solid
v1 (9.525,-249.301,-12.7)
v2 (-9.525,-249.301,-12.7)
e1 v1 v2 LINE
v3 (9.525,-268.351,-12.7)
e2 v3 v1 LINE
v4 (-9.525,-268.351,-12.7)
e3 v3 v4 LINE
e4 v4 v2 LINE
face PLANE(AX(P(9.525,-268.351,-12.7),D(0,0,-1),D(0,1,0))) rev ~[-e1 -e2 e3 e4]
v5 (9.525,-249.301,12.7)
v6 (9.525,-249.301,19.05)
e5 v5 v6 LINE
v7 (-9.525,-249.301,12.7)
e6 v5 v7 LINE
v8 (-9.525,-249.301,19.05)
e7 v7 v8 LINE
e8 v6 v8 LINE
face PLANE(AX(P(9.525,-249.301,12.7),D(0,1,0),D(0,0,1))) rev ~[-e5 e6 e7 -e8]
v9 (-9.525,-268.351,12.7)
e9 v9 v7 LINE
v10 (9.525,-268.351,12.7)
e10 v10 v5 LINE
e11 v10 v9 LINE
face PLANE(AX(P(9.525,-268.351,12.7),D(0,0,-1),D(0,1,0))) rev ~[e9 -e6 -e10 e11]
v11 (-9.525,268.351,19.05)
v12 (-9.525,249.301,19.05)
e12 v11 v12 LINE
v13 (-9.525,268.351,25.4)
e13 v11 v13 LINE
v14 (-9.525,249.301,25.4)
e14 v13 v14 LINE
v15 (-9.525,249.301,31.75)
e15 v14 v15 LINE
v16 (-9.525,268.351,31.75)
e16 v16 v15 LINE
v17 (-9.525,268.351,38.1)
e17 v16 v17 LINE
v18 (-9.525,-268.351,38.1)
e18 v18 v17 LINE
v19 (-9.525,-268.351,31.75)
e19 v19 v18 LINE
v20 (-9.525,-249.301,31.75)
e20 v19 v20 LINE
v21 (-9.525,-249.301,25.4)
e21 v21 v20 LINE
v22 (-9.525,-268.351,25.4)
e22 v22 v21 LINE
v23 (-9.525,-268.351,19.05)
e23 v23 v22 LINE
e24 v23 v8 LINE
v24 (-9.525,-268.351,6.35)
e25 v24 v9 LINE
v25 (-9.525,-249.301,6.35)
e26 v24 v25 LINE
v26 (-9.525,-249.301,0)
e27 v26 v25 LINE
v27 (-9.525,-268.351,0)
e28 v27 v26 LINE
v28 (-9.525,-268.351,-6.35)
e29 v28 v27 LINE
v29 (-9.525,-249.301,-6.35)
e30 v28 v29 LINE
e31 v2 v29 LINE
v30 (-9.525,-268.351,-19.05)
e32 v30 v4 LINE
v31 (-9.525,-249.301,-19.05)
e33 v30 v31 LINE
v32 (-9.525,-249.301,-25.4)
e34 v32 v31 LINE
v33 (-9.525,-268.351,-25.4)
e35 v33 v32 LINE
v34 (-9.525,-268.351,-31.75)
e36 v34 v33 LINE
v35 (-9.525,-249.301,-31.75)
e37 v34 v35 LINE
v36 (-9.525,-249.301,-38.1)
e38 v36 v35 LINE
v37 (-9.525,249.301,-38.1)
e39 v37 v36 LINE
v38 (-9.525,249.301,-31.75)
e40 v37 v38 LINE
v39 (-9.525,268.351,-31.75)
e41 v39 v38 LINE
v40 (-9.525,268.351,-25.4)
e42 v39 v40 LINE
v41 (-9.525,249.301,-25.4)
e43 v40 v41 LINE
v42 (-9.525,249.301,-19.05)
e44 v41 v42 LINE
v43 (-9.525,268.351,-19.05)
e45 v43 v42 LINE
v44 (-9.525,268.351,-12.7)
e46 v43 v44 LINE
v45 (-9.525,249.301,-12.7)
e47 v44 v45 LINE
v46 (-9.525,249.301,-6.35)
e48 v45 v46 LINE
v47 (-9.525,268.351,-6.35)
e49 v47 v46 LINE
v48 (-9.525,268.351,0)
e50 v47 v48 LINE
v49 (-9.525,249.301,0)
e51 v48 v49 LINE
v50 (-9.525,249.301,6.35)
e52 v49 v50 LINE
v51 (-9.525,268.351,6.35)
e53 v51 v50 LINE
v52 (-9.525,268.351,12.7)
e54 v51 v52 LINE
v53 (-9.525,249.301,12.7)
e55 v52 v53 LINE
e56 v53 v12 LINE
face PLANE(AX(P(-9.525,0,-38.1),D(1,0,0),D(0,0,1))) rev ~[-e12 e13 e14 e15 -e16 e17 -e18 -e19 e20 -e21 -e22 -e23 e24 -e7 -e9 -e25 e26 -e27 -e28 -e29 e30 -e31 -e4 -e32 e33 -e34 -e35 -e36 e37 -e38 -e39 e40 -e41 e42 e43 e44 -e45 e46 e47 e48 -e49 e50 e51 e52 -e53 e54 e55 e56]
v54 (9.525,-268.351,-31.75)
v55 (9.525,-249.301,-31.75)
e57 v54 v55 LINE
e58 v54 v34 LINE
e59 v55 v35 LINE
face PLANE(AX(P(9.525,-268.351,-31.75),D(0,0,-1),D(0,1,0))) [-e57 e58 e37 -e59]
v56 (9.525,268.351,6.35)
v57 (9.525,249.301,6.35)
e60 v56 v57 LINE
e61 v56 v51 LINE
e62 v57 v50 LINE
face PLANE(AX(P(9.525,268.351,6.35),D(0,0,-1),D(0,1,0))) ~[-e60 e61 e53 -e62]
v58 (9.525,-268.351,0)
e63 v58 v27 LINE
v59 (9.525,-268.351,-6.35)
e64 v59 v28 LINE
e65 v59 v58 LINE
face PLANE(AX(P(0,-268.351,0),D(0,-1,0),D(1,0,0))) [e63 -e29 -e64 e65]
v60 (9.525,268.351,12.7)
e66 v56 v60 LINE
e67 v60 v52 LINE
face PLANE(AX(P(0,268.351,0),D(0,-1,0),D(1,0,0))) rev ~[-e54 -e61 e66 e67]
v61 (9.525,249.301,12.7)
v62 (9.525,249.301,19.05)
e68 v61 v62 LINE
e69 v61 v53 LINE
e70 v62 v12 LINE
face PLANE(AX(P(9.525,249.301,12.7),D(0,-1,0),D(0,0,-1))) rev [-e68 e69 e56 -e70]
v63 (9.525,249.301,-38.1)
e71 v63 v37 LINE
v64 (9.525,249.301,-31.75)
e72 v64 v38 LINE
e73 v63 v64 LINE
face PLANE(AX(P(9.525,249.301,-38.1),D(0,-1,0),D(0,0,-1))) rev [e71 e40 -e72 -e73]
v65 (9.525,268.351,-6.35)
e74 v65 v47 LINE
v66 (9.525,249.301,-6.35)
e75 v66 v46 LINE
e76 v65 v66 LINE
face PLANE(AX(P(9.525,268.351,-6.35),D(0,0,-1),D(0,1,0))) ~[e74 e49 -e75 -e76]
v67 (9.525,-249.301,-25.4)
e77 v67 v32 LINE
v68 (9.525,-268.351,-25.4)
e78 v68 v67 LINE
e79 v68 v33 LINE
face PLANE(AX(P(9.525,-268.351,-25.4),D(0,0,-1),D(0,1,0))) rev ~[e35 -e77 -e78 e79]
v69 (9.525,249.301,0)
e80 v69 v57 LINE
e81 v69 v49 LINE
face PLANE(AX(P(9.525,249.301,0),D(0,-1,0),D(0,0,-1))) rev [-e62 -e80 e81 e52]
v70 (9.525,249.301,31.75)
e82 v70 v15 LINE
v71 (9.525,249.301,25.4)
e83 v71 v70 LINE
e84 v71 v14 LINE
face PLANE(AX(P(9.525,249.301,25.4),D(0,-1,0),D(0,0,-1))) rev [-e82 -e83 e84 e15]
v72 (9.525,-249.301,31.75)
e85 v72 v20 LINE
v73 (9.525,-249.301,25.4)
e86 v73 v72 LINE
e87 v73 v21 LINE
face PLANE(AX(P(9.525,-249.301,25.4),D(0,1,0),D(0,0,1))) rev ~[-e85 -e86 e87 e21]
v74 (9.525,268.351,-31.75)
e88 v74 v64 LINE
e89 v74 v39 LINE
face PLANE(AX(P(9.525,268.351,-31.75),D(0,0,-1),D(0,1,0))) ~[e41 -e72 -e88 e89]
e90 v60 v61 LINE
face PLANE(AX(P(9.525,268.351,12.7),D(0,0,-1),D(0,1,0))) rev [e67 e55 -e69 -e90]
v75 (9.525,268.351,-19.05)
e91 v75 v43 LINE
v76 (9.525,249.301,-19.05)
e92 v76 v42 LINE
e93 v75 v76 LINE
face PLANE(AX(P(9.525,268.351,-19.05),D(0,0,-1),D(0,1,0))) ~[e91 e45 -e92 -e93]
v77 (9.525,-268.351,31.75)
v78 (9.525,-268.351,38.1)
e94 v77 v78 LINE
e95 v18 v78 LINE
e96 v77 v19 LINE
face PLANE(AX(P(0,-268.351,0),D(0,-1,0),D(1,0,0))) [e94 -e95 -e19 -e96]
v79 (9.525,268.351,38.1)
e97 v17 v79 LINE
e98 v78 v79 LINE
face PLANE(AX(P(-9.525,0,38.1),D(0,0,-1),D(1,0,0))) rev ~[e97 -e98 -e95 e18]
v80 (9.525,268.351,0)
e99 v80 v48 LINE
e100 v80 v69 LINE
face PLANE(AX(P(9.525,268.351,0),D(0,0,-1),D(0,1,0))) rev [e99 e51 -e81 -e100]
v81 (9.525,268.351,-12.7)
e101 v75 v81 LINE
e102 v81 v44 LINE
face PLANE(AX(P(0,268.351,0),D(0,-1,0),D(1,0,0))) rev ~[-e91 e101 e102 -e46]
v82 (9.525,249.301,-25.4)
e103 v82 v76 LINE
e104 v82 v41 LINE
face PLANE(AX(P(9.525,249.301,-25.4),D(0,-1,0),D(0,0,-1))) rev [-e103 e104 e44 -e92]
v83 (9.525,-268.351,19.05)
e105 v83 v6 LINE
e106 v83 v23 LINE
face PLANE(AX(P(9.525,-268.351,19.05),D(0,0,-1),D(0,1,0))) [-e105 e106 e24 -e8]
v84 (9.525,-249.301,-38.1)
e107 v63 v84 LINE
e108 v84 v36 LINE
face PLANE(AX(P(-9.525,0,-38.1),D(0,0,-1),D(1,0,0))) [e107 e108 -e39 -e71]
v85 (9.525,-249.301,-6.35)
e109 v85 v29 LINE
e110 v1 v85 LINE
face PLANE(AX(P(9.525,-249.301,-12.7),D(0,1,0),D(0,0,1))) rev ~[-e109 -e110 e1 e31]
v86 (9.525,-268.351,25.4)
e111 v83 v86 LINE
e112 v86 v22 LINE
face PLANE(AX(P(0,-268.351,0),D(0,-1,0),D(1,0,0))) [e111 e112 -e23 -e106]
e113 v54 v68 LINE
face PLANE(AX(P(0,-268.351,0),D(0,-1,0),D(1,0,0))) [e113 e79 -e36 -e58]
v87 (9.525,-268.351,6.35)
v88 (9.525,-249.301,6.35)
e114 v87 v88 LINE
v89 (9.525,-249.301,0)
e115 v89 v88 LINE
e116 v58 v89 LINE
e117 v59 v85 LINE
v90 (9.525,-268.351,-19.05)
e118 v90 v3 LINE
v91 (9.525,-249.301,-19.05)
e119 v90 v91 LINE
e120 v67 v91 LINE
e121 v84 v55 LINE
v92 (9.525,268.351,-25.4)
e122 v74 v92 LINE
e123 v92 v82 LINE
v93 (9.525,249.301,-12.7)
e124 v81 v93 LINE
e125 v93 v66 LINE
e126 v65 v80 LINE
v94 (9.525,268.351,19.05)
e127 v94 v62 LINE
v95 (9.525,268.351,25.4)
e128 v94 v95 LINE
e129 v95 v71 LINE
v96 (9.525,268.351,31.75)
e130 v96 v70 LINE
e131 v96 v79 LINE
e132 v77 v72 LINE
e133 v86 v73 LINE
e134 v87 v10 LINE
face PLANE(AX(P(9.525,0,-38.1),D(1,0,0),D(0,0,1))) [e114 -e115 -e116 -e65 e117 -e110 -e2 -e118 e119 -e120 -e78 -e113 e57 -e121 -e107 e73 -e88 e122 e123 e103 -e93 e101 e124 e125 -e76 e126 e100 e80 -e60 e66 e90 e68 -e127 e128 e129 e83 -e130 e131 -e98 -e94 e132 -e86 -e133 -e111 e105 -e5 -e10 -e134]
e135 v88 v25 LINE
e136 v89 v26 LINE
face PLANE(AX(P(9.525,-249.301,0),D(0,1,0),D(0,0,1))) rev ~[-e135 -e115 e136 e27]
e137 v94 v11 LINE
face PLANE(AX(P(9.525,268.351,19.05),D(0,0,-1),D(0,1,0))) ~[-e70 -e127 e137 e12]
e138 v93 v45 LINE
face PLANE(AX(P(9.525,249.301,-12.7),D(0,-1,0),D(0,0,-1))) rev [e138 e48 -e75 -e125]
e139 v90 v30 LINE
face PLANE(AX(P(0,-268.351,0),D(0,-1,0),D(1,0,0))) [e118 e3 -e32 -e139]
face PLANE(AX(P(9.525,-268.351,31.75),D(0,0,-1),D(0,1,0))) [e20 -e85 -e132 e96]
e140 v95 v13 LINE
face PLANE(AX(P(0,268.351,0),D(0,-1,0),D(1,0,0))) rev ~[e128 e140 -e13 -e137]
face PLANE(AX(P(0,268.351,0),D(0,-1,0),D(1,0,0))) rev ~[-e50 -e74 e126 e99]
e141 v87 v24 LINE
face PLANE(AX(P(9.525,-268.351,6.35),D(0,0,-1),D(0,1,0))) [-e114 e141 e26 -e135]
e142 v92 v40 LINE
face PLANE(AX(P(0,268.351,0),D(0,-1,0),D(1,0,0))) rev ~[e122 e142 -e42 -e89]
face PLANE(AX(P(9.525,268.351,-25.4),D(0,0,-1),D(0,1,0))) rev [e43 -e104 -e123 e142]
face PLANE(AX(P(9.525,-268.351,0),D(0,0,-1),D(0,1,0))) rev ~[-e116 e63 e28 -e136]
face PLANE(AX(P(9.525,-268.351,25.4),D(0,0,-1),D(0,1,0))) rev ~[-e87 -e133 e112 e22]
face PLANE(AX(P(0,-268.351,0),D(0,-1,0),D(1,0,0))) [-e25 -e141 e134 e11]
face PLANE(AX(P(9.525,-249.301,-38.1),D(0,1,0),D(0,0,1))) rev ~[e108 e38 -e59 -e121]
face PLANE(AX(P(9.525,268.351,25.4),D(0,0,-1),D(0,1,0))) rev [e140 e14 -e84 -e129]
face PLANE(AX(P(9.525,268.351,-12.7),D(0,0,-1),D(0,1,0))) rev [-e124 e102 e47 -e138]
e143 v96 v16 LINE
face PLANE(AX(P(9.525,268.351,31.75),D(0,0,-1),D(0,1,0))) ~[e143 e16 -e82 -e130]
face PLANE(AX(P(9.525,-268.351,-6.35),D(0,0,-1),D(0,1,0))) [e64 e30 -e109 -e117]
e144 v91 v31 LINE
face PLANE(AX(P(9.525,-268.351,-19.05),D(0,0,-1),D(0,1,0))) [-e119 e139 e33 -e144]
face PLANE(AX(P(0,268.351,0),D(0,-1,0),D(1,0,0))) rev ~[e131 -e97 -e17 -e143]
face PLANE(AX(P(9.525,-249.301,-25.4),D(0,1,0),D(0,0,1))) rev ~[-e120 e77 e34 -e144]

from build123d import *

# Parameters (mm, degrees)
F0_W     = 19.05
F0_H     = 76.2
F1_DEPTH = 268.351
F2_W     = 19.05
F2_H     = 6.35
F3_DEPTH = 19.051


# Not quite as in the source:
# - a pattern or mirror of a feature is missing from the dataset's text; its kind, count and spacing are read off the source's solid


with BuildPart() as f1:
    # F0 (on Front) → F1 (new body, symmetric)
    with BuildSketch(Plane.XZ):
        Rectangle(F0_W, F0_H)
    extrude(amount=F1_DEPTH, both=True)

    # F2 (on face) → F3 (cut, through all)
    with BuildSketch(Plane.YZ.offset(9.525)):
        with Locations((-258.826, 28.575)):
            Rectangle(F2_W, F2_H)
        with Locations((-258.826, 3.175)):
            Rectangle(F2_W, F2_H)
        with Locations((-258.826, -9.525)):
            Rectangle(F2_W, F2_H)
        with Locations((-258.826, -22.225)):
            Rectangle(F2_W, F2_H)
        with Locations((-258.826, 15.875)):
            Rectangle(F2_W, F2_H)
        with Locations((-258.826, -34.925)):
            Rectangle(F2_W, F2_H)
    f3 = extrude(amount=-F3_DEPTH, mode=Mode.SUBTRACT)

    # F3_copies: F3 across plane
    add(f3.mirror(Plane.ZX), mode=Mode.SUBTRACT)


solid = f1.part
